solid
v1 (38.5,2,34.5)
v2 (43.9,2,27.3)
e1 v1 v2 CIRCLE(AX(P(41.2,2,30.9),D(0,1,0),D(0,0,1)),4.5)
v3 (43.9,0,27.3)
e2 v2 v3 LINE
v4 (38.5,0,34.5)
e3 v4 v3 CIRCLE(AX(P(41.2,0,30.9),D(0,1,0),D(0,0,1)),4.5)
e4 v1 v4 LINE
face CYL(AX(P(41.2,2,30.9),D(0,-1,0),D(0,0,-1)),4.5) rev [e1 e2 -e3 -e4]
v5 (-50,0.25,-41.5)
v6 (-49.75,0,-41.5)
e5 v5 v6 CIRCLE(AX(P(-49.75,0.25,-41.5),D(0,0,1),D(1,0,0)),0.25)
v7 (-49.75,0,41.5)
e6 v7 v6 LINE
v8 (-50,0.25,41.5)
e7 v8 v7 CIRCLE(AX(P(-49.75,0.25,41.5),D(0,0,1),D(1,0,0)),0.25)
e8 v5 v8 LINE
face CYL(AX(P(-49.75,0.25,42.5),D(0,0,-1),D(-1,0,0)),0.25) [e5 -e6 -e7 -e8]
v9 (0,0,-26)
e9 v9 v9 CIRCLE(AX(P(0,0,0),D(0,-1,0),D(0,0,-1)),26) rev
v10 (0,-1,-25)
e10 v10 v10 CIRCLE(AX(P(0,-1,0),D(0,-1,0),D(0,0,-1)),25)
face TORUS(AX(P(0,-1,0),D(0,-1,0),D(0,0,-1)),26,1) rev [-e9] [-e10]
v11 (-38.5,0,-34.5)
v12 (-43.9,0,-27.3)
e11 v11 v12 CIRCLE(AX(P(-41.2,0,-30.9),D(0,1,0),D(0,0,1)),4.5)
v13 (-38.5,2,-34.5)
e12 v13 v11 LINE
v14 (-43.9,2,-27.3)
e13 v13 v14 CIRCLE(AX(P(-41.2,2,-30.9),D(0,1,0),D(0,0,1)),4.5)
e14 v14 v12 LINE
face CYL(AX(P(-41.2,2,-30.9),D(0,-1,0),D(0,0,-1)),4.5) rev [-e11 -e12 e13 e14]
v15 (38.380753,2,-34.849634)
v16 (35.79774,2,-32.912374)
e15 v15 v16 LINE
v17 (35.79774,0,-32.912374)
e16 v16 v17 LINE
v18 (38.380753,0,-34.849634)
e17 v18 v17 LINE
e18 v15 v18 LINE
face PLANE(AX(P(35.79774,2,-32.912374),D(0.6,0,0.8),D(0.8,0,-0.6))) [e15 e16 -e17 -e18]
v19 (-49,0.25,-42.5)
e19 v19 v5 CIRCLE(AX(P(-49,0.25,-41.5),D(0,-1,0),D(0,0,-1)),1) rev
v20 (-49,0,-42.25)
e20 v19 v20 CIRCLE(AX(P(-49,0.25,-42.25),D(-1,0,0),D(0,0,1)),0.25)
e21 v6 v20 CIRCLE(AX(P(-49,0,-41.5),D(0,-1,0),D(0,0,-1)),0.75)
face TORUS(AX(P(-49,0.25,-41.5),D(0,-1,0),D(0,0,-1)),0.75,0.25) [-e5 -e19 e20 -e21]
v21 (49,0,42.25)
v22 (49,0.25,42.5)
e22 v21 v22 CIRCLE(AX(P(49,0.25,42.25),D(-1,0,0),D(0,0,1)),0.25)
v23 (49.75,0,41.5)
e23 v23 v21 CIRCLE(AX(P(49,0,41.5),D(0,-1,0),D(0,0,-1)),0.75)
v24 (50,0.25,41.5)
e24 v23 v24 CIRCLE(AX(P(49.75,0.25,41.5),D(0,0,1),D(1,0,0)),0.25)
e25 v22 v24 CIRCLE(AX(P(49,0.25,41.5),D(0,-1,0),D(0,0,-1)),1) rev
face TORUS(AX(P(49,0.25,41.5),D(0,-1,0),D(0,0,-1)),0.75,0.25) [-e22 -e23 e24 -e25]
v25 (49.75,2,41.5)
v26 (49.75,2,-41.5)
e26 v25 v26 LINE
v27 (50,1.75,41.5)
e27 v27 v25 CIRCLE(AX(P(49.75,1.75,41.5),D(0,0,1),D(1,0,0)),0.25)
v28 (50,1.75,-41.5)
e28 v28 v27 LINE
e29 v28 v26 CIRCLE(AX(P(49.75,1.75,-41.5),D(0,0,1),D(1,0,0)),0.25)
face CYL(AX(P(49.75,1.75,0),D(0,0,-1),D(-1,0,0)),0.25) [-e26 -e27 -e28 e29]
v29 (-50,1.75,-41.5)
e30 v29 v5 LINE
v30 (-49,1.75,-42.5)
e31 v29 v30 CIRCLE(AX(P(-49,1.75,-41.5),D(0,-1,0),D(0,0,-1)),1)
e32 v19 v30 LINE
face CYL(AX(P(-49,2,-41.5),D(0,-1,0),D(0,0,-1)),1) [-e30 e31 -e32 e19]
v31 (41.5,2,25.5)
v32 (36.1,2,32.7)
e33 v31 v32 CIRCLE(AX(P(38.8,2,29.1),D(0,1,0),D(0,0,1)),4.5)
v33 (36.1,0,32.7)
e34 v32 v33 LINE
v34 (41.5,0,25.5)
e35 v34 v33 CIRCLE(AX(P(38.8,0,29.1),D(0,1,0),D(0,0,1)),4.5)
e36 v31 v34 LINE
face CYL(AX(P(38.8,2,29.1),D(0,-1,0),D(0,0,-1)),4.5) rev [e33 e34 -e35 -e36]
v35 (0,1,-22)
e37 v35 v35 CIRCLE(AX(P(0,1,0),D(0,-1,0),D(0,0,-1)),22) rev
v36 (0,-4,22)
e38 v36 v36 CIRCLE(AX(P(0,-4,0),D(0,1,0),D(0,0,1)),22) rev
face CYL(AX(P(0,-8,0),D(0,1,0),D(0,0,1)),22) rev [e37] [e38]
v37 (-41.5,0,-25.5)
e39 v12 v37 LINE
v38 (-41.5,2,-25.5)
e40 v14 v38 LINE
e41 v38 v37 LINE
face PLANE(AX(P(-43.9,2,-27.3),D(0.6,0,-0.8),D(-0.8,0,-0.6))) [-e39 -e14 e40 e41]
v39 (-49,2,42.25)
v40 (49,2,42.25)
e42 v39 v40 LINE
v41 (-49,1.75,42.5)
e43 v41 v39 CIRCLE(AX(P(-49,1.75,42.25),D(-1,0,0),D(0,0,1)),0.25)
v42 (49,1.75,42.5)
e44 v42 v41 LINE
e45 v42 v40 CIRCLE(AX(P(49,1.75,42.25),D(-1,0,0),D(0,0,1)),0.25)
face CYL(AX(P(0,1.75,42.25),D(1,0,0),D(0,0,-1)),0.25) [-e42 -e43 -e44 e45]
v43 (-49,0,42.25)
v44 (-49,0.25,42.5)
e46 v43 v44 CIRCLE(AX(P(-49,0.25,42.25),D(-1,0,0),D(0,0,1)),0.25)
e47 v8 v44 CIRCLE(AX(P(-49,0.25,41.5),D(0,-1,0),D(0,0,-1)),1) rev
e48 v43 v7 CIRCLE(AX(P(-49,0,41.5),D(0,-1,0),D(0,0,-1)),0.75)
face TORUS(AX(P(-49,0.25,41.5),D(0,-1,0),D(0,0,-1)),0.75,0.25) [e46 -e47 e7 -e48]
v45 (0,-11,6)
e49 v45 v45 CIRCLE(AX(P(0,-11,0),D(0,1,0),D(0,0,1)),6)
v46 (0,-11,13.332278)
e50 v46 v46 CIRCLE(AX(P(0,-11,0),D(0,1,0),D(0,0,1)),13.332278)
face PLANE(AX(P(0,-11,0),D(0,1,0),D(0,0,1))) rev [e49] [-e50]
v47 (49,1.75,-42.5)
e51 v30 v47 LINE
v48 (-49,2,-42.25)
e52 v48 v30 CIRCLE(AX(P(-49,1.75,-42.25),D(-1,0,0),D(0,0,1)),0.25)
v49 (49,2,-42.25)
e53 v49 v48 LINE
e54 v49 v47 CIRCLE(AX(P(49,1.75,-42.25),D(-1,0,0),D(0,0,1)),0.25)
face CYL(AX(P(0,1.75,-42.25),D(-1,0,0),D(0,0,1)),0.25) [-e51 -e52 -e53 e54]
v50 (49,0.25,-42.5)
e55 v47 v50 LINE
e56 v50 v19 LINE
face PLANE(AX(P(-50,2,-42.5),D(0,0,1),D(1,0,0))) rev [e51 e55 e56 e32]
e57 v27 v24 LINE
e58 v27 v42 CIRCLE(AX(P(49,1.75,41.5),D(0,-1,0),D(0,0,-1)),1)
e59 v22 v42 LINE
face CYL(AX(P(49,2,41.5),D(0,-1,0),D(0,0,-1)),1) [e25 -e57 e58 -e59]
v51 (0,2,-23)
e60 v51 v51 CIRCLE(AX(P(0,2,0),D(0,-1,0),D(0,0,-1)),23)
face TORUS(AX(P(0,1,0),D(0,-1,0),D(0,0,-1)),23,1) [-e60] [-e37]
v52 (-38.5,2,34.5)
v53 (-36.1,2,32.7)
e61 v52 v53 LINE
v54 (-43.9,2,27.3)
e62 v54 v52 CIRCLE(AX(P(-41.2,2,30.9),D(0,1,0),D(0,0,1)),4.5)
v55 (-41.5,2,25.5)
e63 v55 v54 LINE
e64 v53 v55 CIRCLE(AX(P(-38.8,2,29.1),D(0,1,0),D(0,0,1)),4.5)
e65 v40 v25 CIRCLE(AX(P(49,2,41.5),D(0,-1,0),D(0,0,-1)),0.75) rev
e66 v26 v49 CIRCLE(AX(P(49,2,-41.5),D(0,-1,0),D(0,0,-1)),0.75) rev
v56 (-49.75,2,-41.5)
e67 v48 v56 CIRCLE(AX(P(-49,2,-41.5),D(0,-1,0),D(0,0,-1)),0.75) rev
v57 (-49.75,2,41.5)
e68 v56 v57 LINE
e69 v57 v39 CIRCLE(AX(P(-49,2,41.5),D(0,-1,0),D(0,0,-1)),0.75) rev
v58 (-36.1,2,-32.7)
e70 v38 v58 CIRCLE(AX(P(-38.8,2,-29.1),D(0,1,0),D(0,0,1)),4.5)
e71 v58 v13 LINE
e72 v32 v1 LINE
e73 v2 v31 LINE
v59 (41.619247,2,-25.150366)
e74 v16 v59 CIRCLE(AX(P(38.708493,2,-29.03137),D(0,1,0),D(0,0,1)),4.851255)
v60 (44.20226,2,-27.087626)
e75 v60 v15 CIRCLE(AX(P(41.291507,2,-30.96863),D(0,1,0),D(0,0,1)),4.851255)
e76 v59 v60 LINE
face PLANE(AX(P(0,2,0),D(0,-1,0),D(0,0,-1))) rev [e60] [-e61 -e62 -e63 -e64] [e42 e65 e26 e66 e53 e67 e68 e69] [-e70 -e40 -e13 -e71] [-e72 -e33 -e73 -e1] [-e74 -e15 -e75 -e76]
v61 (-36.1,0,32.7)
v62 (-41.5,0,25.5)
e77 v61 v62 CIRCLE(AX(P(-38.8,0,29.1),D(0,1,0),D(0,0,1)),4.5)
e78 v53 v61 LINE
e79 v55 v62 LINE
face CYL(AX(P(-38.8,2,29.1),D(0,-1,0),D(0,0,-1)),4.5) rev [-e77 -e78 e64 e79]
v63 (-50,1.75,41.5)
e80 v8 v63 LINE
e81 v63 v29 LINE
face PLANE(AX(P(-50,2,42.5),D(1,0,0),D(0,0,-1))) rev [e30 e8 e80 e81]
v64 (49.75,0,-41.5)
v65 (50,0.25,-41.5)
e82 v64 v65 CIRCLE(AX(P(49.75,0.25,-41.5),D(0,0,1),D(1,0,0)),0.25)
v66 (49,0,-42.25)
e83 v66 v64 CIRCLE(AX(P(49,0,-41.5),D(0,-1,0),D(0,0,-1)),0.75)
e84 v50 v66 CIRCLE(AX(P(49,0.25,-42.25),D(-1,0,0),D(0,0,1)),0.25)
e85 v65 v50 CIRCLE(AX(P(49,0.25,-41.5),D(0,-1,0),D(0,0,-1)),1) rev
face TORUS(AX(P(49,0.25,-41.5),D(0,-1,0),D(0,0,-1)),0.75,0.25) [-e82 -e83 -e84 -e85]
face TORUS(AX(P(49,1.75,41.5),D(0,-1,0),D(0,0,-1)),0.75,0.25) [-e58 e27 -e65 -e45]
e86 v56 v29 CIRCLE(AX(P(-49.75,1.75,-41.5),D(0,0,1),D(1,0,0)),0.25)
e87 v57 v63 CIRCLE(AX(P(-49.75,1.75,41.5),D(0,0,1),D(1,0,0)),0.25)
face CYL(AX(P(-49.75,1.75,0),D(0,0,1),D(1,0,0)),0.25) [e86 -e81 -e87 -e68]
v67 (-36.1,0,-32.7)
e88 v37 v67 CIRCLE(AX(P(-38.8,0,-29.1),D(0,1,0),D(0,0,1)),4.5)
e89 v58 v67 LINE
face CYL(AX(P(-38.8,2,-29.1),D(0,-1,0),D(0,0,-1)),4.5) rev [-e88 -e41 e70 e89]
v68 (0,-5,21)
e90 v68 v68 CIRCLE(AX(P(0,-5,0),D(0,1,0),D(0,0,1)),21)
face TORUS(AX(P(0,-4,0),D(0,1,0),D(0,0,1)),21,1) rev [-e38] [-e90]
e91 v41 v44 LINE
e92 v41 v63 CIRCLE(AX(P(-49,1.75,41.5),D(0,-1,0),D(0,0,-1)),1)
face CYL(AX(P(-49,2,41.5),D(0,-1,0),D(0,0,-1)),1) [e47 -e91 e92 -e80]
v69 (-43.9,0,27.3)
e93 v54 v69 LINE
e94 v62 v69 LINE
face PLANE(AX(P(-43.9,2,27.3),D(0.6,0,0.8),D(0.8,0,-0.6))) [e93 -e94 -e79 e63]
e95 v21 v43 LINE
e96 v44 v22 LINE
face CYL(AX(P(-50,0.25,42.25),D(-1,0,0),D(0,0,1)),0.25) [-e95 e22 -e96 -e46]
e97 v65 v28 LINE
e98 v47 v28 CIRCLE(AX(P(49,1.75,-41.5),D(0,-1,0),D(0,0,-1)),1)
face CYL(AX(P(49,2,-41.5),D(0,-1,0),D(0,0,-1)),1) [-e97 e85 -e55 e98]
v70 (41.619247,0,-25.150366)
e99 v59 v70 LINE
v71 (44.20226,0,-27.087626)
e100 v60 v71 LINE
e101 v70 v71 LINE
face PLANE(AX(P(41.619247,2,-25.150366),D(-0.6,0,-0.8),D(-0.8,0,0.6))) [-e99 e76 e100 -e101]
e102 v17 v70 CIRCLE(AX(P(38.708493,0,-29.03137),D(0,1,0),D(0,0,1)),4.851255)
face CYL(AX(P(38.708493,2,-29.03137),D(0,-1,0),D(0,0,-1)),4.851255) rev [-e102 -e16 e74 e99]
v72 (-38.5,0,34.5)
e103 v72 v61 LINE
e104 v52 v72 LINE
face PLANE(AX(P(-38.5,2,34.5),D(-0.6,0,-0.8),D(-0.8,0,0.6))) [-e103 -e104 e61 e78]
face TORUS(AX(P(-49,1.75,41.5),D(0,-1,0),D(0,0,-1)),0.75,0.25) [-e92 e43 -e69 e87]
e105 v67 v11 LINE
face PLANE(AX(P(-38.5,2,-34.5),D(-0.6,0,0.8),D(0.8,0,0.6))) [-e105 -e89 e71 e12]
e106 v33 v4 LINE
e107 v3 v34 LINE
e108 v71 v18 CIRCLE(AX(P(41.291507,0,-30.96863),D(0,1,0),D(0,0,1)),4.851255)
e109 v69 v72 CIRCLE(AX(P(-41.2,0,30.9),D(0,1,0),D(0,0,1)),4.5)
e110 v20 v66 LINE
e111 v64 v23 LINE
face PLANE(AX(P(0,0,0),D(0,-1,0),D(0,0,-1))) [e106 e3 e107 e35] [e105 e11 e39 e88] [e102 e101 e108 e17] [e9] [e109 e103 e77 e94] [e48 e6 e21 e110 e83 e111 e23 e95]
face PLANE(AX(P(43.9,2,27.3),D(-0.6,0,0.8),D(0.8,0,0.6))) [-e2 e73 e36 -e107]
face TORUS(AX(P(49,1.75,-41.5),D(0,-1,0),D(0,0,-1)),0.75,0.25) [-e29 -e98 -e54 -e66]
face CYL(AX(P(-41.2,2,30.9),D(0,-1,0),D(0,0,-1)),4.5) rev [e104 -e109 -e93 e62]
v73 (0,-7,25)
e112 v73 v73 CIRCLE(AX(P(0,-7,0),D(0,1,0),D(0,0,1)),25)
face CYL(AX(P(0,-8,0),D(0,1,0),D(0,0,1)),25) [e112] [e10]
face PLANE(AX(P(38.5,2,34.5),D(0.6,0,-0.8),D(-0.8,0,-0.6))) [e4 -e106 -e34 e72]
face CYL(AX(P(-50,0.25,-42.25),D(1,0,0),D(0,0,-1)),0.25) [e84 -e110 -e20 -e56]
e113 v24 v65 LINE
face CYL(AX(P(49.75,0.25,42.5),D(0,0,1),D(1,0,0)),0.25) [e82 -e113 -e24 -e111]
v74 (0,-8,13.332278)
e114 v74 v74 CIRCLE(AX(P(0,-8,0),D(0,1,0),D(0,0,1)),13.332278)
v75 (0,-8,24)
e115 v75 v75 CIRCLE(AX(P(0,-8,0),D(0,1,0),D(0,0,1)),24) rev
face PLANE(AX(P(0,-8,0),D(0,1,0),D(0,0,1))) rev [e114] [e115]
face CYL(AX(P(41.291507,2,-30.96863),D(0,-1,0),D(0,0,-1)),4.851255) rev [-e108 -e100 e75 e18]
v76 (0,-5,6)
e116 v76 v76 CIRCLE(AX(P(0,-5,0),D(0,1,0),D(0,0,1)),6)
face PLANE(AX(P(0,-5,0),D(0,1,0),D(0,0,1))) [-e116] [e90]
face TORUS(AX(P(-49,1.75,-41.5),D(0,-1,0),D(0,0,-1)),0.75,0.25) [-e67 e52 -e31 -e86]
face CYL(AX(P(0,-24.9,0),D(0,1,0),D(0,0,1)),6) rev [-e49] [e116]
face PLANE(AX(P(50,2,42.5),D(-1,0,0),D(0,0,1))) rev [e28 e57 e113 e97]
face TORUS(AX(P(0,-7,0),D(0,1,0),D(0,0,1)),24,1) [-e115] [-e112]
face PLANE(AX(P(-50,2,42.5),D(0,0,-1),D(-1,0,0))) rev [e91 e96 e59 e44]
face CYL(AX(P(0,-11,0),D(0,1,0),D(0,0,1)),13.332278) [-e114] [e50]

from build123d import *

# Parameters (mm, degrees)
SKETCH_2_W          = 100
SKETCH_2_H          = 85
SKETCH_2_R          = 6
EXTRUDE_1_DEPTH     = 2
SKETCH_3_R          = 25
EXTRUDE_2_DEPTH     = 10
SHELL_1_T           = 3
FILLET_1_R          = 1
SKETCH_5_R          = 13.33227761
EXTRUDE_3_DEPTH     = 6
SKETCH_4_R          = 6
CUT_EXTRUDE_2_DEPTH = 19.9
FILLET_3_R          = 1
FILLET_4_R          = 0.25


with BuildPart() as part:
    # Эскиз2 → Бобышка-Вытянуть1 (new body)
    with BuildSketch(Plane(origin=(0, 0, 0), x_dir=(1, 0, 0), z_dir=(0, 1, 0))):
        Rectangle(SKETCH_2_W, SKETCH_2_H)
        with Locations(Location((0, 0, 0), (0, 0, 270))):
            Circle(SKETCH_2_R, mode=Mode.SUBTRACT)
        with BuildLine():
            Line((35.797740165, 32.912374401), (38.380753328, 34.849634274))
            ThreePointArc((38.380753328, 34.849634274), (45.172510919, 33.879383189), (44.202259835, 27.087625599))
            Line((44.202259835, 27.087625599), (41.619246672, 25.150365726))
            ThreePointArc((41.619246672, 25.150365726), (34.827489081, 26.120616811), (35.797740165, 32.912374401))
        make_face(mode=Mode.SUBTRACT)
        with BuildLine():
            Line((-38.5, 34.5), (-36.1, 32.7))
            ThreePointArc((-36.1, 32.7), (-35.2, 26.4), (-41.5, 25.5))
            Line((-41.5, 25.5), (-43.9, 27.3))
            ThreePointArc((-43.9, 27.3), (-44.8, 33.6), (-38.5, 34.5))
        make_face(mode=Mode.SUBTRACT)
        with BuildLine():
            Line((38.5, -34.5), (36.1, -32.7))
            ThreePointArc((36.1, -32.7), (35.2, -26.4), (41.5, -25.5))
            Line((41.5, -25.5), (43.9, -27.3))
            ThreePointArc((43.9, -27.3), (44.8, -33.6), (38.5, -34.5))
        make_face(mode=Mode.SUBTRACT)
        with BuildLine():
            Line((-43.9, -27.3), (-41.5, -25.5))
            ThreePointArc((-41.5, -25.5), (-35.2, -26.4), (-36.1, -32.7))
            Line((-36.1, -32.7), (-38.5, -34.5))
            ThreePointArc((-38.5, -34.5), (-44.8, -33.6), (-43.9, -27.3))
        make_face(mode=Mode.SUBTRACT)
    extrude(amount=EXTRUDE_1_DEPTH)

    # Эскиз3 → Бобышка-Вытянуть2 (add)
    with BuildSketch(Plane(origin=(0, 2, 0), x_dir=(1, 0, 0), z_dir=(0, 1, 0))):
        with Locations(Location((0, 0, 0), (0, 0, 270))):
            Circle(SKETCH_3_R)
    extrude(amount=-EXTRUDE_2_DEPTH)

    # Оболочка1
    # the kernel refuses this shell: the inside is offset whole and opened at the faces by hand
    shell_1_offset = offset(amount=-SHELL_1_T, mode=Mode.PRIVATE)
    shell_1_offset = shell_1_offset + extrude(shell_1_offset.faces().sort_by_distance((0, -1, 0))[0], amount=SHELL_1_T, mode=Mode.PRIVATE)
    add(shell_1_offset, mode=Mode.SUBTRACT)

    # Скругление1
    fillet_1_edges = [part.edges().sort_by_distance(p)[0] for p in [
        (0, 0, -25),
        (0, -8, -25),
        (0, -5, -22),
        (0, 2, -22),
    ]]
    fillet(fillet_1_edges, radius=FILLET_1_R)

    # Эскиз5 → Бобышка-Вытянуть3 (add)
    with BuildSketch(Plane(origin=(0, -5, 0), x_dir=(1, 0, 0), z_dir=(0, 1, 0))):
        with Locations(Location((0, 0, 0), (0, 0, 270))):
            Circle(SKETCH_5_R)
    extrude(amount=-EXTRUDE_3_DEPTH)

    # Эскиз4 → Вырез-Вытянуть2 (cut, symmetric)
    with BuildSketch(Plane(origin=(0, -5, 0), x_dir=(1, 0, 0), z_dir=(0, 1, 0))):
        with Locations(Location((0, 0, 0), (0, 0, 270))):
            Circle(SKETCH_4_R)
    extrude(amount=CUT_EXTRUDE_2_DEPTH, both=True, mode=Mode.SUBTRACT)

    # Скругление3
    fillet_3_edges = [part.edges().sort_by_distance(p)[0] for p in [
        (50, 1, 42.5),
        (-50, 1, 42.5),
        (-50, 1, -42.5),
        (50, 1, -42.5),
    ]]
    fillet(fillet_3_edges, radius=FILLET_3_R)

    # Скругление4
    fillet_4_edges = [part.edges().sort_by_distance(p)[0] for p in [
        (50, 0, 0),
        (50, 2, 0),
        (0, 0, 42.5),
        (-50, 0, 0),
        (0, 0, -42.5),
        (-49.707106781, 0, 42.207106781),
        (-49.707106781, 0, -42.207106781),
        (49.707106781, 0, -42.207106781),
        (49.707106781, 0, 42.207106781),
        (0, 2, 42.5),
        (0, 2, -42.5),
        (-50, 2, 0),
        (-49.707106781, 2, 42.207106781),
        (-49.707106781, 2, -42.207106781),
        (49.707106781, 2, -42.207106781),
        (49.707106781, 2, 42.207106781),
    ]]
    fillet(fillet_4_edges, radius=FILLET_4_R)


solid = part.part
